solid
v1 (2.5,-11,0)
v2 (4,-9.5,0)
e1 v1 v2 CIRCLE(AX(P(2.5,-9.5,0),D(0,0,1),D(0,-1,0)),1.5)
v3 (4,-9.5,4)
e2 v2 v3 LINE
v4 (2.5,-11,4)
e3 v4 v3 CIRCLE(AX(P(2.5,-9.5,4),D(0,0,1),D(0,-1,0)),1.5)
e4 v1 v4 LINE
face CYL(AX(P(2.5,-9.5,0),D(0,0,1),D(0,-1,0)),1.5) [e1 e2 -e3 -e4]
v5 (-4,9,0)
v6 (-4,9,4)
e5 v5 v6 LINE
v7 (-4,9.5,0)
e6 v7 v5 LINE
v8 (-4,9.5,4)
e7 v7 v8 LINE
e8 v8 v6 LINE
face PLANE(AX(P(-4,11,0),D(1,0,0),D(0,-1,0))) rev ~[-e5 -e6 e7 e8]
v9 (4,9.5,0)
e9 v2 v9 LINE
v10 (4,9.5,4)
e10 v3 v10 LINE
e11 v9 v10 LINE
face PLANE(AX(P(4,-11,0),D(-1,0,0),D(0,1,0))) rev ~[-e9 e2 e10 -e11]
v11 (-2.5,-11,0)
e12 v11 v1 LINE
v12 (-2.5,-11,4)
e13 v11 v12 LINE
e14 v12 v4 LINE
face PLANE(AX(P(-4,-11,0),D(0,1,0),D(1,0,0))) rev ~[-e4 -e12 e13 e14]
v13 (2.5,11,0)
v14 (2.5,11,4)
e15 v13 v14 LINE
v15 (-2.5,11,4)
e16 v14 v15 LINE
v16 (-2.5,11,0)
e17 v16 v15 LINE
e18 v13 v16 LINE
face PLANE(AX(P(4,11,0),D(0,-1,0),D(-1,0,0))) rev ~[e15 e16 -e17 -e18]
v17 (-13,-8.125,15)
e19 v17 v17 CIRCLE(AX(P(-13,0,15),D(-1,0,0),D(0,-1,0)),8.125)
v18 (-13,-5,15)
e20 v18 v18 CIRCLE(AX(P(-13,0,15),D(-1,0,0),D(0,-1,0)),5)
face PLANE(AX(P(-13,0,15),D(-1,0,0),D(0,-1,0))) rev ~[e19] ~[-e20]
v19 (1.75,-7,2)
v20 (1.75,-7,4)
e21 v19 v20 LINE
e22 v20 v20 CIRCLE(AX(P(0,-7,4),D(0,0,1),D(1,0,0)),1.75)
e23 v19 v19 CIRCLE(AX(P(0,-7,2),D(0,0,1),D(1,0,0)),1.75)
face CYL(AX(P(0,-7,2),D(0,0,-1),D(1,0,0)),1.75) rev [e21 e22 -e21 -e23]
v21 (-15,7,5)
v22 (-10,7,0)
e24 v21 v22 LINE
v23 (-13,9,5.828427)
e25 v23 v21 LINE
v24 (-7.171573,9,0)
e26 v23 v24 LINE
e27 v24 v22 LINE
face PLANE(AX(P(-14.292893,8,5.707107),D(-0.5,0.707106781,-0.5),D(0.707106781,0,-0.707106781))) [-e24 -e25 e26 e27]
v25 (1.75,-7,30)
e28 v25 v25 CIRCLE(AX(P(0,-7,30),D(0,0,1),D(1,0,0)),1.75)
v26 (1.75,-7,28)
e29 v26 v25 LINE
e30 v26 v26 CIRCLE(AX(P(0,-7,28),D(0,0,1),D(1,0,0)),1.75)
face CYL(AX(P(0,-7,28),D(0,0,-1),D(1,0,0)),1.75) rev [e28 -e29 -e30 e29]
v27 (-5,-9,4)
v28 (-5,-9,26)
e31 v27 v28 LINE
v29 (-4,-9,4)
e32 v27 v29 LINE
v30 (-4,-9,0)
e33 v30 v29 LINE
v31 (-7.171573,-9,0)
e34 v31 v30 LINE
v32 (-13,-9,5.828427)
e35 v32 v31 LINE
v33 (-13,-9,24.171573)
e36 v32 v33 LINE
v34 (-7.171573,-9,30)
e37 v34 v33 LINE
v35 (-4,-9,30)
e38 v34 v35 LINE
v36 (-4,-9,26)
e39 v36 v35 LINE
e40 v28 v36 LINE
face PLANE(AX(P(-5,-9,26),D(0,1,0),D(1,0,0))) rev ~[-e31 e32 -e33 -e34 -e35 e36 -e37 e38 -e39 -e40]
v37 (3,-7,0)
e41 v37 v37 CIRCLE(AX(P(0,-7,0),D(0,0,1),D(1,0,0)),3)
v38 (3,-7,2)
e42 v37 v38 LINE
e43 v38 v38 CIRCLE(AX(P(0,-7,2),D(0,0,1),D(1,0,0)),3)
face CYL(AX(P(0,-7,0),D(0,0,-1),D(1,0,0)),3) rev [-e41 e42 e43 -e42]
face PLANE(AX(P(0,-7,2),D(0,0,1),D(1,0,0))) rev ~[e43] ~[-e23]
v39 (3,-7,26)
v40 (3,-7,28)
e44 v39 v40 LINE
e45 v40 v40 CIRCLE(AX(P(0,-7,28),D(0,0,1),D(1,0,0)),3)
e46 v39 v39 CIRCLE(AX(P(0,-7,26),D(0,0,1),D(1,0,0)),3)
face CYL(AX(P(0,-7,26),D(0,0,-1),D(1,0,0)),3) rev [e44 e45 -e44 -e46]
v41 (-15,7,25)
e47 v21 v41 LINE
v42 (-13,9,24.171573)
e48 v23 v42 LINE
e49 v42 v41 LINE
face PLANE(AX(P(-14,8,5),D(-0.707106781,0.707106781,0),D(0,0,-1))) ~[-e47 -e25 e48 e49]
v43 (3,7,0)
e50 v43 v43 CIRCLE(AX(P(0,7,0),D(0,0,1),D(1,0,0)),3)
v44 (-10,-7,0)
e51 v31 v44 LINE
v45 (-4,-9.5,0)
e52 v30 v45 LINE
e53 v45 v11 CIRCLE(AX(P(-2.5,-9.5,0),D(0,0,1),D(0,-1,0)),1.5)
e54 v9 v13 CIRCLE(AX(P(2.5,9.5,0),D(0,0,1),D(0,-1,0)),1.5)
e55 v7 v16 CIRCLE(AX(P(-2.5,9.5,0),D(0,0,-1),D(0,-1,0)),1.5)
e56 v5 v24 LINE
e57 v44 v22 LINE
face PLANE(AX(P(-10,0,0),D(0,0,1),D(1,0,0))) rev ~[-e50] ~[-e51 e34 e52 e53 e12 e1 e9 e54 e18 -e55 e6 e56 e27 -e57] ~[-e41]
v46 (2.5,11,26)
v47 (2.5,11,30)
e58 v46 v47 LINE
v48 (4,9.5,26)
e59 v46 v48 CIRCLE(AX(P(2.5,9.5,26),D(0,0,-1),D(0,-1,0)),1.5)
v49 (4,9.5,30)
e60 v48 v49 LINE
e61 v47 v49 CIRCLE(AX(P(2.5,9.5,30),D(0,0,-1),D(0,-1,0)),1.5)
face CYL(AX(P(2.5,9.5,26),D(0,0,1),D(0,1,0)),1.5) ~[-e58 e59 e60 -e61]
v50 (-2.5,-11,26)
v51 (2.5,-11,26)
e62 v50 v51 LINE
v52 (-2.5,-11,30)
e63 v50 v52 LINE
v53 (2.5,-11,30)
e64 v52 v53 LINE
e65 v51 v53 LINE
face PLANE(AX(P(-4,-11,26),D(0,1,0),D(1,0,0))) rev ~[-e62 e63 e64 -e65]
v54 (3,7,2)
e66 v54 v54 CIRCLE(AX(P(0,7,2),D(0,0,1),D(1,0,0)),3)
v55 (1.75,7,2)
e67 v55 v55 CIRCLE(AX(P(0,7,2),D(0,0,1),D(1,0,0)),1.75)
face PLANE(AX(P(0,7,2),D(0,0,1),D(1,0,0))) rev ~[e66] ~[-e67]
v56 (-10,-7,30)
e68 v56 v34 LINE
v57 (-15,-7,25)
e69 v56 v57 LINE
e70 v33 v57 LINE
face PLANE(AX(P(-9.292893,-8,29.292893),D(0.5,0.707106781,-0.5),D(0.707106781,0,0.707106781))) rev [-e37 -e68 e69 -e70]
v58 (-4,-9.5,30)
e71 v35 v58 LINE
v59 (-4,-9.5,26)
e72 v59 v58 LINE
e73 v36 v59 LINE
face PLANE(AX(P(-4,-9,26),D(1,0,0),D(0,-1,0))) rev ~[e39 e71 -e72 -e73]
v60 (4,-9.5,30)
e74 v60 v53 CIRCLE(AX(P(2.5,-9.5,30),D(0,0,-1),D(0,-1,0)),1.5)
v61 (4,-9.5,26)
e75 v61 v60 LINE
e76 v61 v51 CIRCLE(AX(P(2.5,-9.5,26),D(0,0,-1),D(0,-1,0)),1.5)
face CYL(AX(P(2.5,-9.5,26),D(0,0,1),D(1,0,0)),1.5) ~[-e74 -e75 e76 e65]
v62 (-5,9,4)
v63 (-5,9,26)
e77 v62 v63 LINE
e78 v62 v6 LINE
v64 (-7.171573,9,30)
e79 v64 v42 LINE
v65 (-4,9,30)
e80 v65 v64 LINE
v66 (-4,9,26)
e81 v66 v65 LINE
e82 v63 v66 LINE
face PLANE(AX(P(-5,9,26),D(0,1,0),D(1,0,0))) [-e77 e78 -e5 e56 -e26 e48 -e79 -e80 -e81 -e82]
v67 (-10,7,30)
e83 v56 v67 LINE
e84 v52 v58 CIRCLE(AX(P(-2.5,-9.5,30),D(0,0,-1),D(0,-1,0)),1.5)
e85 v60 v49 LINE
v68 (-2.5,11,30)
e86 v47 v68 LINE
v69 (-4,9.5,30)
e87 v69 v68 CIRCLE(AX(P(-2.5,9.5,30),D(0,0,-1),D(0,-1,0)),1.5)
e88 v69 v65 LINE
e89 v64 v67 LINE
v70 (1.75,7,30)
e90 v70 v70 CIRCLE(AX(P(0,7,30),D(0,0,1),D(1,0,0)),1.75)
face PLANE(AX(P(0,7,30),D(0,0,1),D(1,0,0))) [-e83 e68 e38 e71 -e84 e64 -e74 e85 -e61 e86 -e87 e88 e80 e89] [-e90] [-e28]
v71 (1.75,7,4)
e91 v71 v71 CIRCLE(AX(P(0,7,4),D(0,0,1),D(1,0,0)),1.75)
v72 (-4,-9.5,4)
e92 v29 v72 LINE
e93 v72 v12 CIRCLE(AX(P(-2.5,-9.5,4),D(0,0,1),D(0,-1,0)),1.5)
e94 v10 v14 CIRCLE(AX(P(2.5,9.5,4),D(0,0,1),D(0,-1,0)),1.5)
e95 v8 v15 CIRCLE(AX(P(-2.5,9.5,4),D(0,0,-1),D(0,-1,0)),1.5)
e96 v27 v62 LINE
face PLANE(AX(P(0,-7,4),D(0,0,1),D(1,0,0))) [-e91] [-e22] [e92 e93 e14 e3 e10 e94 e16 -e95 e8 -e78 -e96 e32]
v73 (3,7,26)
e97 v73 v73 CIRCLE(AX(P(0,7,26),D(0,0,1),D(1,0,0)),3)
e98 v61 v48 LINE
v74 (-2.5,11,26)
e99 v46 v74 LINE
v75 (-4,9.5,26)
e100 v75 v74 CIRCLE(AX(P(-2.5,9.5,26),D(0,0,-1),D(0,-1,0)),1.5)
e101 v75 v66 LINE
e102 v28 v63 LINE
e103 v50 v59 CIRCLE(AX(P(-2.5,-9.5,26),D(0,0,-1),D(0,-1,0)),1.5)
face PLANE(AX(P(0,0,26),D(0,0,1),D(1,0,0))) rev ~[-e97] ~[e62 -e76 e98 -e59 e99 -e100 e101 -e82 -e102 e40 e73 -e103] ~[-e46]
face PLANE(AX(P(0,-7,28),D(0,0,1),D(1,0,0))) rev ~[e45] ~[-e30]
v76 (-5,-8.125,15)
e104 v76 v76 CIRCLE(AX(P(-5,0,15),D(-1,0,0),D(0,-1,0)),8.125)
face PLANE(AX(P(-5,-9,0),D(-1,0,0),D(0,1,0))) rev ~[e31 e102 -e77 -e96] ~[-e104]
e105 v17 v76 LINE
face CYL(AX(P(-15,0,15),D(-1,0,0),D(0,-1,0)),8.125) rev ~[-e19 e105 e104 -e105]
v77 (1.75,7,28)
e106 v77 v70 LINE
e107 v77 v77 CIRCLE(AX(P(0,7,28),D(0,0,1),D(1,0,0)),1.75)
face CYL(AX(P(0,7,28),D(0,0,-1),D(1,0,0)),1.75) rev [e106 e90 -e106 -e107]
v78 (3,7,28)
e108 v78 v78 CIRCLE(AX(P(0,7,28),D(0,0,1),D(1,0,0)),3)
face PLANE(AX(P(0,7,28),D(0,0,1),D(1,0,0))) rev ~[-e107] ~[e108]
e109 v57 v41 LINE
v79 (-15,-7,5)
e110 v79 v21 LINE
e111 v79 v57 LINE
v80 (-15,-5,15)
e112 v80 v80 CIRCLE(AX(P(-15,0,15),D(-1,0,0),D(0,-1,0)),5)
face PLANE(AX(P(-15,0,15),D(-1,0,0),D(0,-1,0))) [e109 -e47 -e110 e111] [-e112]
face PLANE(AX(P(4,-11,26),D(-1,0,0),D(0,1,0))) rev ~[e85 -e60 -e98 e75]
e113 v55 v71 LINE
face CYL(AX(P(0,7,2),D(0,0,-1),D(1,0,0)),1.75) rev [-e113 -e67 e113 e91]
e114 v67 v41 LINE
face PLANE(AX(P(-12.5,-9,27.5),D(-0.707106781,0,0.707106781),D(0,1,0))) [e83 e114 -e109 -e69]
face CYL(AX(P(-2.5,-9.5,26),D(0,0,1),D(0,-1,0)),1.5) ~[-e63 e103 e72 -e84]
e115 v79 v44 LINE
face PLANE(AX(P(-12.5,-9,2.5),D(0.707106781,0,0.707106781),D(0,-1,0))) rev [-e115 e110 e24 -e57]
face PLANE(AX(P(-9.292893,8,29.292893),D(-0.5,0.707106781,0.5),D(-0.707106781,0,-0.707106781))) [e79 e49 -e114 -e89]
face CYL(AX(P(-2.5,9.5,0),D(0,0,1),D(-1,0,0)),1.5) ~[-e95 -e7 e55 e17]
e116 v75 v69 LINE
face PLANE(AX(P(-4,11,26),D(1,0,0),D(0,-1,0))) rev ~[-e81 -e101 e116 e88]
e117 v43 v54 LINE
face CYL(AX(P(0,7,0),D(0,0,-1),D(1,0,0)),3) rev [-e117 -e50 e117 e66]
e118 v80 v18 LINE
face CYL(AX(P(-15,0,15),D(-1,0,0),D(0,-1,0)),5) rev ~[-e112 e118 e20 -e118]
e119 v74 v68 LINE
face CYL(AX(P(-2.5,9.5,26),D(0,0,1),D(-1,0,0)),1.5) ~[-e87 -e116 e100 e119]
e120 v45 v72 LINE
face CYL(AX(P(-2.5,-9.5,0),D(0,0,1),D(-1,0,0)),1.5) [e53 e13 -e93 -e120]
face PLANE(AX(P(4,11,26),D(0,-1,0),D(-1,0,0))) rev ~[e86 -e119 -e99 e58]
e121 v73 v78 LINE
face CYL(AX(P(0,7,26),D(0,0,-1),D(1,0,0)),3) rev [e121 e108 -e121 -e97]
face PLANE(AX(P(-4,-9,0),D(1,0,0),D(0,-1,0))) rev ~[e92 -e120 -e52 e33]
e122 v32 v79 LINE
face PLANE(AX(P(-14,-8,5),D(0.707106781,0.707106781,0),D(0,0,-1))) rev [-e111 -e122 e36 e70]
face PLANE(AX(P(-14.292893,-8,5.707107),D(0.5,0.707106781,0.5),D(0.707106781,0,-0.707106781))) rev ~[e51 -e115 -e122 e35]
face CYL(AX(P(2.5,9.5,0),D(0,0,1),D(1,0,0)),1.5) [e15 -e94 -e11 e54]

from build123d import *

# Parameters (mm, degrees)
F2_R      = 3
F2_W      = 1
F2_H      = 18
F3_DEPTH  = 4
F4_START  = 2
F2_R_2    = 1.75
F4_DEPTH  = 2
F2_W_2    = 10
F5_DEPTH  = 30
F6_START  = 26
F6_DEPTH  = 4
F7_R      = 8.125
F7_R_2    = 5
F8_DEPTH  = 10
F9_DEPTH  = 2
F10_START = 28
F10_DEPTH = 2
F11_SIZE  = 5
F12_SIZE  = 2
F13_R     = 1.5


# Not quite as in the source:
# - a feature names something its author has since deleted; it is built from what else it names


with BuildPart() as f3:
    # F2 (on Top) → F3 (new body)
    with BuildSketch(Plane.XY):
        Polygon((4, 11), (-4, 11), (-4, 9), (-4, -9), (-4, -11), (4, -11), align=None)
        with Locations((0, -7)):
            Circle(F2_R, mode=Mode.SUBTRACT)
        with Locations((0, 7)):
            Circle(F2_R, mode=Mode.SUBTRACT)
        with Locations((-4.5, 0)):
            Rectangle(F2_W, F2_H)
    extrude(amount=F3_DEPTH)

    # F2 (on Top) → F4 (join)
    with BuildSketch(Plane.XY.offset(F4_START)):
        with Locations((0, -7)):
            Circle(F2_R)
        with Locations((0, -7)):
            Circle(F2_R_2, mode=Mode.SUBTRACT)
        with Locations((0, 7)):
            Circle(F2_R)
        with Locations((0, 7)):
            Circle(F2_R_2, mode=Mode.SUBTRACT)
    extrude(amount=F4_DEPTH)

    # F2 (on Top) → F5 (join)
    with BuildSketch(Plane.XY):
        with Locations((-10, 0)):
            Rectangle(F2_W_2, F2_H)
    extrude(amount=F5_DEPTH)

    # F2 (on Top) → F6 (join)
    with BuildSketch(Plane.XY.offset(F6_START)):
        Polygon((4, 11), (-4, 11), (-4, 9), (-4, -9), (-4, -11), (4, -11), align=None)
        with Locations((0, -7)):
            Circle(F2_R, mode=Mode.SUBTRACT)
        with Locations((0, 7)):
            Circle(F2_R, mode=Mode.SUBTRACT)
        with Locations((-4.5, 0)):
            Rectangle(F2_W, F2_H)
    extrude(amount=F6_DEPTH)

    # F7 (on face) → F8 (cut)
    with BuildSketch(Plane(origin=(-15, 0, 0), x_dir=(0, -1, 0), z_dir=(-1, 0, 0))):
        with Locations((0, 15)):
            Circle(F7_R)
        with Locations((0, 15)):
            Circle(F7_R_2, mode=Mode.SUBTRACT)
        with Locations((0, 15)):
            Circle(F7_R_2)
    extrude(amount=-F8_DEPTH, mode=Mode.SUBTRACT)

    # F7 (on face) → F9 (join)
    with BuildSketch(Plane(origin=(-15, 0, 0), x_dir=(0, -1, 0), z_dir=(-1, 0, 0))):
        with Locations((0, 15)):
            Circle(F7_R)
        with Locations((0, 15)):
            Circle(F7_R_2, mode=Mode.SUBTRACT)
    extrude(amount=-F9_DEPTH)

    # F2 (on Top) → F10 (join)
    with BuildSketch(Plane.XY.offset(F10_START)):
        with Locations((0, 7)):
            Circle(F2_R)
        with Locations((0, 7)):
            Circle(F2_R_2, mode=Mode.SUBTRACT)
        with Locations((0, -7)):
            Circle(F2_R)
        with Locations((0, -7)):
            Circle(F2_R_2, mode=Mode.SUBTRACT)
    extrude(amount=F10_DEPTH)

    # F11
    f11_edges = [f3.edges().sort_by_distance(p)[0] for p in [
        (-15, 0, 0),
        (-15, 0, 30),
    ]]
    chamfer(f11_edges, length=F11_SIZE)

    # F12
    f12_edges = [f3.edges().sort_by_distance(p)[0] for p in [
        (-15, -9, 15),
        (-15, 9, 15),
        (-12.5, 9, 27.5),
        (-12.5, -9, 27.5),
        (-12.5, 9, 2.5),
        (-12.5, -9, 2.5),
    ]]
    chamfer(f12_edges, length=F12_SIZE)

    # F13
    f13_edges = [f3.edges().sort_by_distance(p)[0] for p in [
        (4, 11, 2),
        (4, -11, 2),
        (-4, -11, 2),
        (-4, 11, 2),
        (4, 11, 28),
        (-4, 11, 28),
        (-4, -11, 28),
        (4, -11, 28),
    ]]
    fillet(f13_edges, radius=F13_R)


solid = f3.part
